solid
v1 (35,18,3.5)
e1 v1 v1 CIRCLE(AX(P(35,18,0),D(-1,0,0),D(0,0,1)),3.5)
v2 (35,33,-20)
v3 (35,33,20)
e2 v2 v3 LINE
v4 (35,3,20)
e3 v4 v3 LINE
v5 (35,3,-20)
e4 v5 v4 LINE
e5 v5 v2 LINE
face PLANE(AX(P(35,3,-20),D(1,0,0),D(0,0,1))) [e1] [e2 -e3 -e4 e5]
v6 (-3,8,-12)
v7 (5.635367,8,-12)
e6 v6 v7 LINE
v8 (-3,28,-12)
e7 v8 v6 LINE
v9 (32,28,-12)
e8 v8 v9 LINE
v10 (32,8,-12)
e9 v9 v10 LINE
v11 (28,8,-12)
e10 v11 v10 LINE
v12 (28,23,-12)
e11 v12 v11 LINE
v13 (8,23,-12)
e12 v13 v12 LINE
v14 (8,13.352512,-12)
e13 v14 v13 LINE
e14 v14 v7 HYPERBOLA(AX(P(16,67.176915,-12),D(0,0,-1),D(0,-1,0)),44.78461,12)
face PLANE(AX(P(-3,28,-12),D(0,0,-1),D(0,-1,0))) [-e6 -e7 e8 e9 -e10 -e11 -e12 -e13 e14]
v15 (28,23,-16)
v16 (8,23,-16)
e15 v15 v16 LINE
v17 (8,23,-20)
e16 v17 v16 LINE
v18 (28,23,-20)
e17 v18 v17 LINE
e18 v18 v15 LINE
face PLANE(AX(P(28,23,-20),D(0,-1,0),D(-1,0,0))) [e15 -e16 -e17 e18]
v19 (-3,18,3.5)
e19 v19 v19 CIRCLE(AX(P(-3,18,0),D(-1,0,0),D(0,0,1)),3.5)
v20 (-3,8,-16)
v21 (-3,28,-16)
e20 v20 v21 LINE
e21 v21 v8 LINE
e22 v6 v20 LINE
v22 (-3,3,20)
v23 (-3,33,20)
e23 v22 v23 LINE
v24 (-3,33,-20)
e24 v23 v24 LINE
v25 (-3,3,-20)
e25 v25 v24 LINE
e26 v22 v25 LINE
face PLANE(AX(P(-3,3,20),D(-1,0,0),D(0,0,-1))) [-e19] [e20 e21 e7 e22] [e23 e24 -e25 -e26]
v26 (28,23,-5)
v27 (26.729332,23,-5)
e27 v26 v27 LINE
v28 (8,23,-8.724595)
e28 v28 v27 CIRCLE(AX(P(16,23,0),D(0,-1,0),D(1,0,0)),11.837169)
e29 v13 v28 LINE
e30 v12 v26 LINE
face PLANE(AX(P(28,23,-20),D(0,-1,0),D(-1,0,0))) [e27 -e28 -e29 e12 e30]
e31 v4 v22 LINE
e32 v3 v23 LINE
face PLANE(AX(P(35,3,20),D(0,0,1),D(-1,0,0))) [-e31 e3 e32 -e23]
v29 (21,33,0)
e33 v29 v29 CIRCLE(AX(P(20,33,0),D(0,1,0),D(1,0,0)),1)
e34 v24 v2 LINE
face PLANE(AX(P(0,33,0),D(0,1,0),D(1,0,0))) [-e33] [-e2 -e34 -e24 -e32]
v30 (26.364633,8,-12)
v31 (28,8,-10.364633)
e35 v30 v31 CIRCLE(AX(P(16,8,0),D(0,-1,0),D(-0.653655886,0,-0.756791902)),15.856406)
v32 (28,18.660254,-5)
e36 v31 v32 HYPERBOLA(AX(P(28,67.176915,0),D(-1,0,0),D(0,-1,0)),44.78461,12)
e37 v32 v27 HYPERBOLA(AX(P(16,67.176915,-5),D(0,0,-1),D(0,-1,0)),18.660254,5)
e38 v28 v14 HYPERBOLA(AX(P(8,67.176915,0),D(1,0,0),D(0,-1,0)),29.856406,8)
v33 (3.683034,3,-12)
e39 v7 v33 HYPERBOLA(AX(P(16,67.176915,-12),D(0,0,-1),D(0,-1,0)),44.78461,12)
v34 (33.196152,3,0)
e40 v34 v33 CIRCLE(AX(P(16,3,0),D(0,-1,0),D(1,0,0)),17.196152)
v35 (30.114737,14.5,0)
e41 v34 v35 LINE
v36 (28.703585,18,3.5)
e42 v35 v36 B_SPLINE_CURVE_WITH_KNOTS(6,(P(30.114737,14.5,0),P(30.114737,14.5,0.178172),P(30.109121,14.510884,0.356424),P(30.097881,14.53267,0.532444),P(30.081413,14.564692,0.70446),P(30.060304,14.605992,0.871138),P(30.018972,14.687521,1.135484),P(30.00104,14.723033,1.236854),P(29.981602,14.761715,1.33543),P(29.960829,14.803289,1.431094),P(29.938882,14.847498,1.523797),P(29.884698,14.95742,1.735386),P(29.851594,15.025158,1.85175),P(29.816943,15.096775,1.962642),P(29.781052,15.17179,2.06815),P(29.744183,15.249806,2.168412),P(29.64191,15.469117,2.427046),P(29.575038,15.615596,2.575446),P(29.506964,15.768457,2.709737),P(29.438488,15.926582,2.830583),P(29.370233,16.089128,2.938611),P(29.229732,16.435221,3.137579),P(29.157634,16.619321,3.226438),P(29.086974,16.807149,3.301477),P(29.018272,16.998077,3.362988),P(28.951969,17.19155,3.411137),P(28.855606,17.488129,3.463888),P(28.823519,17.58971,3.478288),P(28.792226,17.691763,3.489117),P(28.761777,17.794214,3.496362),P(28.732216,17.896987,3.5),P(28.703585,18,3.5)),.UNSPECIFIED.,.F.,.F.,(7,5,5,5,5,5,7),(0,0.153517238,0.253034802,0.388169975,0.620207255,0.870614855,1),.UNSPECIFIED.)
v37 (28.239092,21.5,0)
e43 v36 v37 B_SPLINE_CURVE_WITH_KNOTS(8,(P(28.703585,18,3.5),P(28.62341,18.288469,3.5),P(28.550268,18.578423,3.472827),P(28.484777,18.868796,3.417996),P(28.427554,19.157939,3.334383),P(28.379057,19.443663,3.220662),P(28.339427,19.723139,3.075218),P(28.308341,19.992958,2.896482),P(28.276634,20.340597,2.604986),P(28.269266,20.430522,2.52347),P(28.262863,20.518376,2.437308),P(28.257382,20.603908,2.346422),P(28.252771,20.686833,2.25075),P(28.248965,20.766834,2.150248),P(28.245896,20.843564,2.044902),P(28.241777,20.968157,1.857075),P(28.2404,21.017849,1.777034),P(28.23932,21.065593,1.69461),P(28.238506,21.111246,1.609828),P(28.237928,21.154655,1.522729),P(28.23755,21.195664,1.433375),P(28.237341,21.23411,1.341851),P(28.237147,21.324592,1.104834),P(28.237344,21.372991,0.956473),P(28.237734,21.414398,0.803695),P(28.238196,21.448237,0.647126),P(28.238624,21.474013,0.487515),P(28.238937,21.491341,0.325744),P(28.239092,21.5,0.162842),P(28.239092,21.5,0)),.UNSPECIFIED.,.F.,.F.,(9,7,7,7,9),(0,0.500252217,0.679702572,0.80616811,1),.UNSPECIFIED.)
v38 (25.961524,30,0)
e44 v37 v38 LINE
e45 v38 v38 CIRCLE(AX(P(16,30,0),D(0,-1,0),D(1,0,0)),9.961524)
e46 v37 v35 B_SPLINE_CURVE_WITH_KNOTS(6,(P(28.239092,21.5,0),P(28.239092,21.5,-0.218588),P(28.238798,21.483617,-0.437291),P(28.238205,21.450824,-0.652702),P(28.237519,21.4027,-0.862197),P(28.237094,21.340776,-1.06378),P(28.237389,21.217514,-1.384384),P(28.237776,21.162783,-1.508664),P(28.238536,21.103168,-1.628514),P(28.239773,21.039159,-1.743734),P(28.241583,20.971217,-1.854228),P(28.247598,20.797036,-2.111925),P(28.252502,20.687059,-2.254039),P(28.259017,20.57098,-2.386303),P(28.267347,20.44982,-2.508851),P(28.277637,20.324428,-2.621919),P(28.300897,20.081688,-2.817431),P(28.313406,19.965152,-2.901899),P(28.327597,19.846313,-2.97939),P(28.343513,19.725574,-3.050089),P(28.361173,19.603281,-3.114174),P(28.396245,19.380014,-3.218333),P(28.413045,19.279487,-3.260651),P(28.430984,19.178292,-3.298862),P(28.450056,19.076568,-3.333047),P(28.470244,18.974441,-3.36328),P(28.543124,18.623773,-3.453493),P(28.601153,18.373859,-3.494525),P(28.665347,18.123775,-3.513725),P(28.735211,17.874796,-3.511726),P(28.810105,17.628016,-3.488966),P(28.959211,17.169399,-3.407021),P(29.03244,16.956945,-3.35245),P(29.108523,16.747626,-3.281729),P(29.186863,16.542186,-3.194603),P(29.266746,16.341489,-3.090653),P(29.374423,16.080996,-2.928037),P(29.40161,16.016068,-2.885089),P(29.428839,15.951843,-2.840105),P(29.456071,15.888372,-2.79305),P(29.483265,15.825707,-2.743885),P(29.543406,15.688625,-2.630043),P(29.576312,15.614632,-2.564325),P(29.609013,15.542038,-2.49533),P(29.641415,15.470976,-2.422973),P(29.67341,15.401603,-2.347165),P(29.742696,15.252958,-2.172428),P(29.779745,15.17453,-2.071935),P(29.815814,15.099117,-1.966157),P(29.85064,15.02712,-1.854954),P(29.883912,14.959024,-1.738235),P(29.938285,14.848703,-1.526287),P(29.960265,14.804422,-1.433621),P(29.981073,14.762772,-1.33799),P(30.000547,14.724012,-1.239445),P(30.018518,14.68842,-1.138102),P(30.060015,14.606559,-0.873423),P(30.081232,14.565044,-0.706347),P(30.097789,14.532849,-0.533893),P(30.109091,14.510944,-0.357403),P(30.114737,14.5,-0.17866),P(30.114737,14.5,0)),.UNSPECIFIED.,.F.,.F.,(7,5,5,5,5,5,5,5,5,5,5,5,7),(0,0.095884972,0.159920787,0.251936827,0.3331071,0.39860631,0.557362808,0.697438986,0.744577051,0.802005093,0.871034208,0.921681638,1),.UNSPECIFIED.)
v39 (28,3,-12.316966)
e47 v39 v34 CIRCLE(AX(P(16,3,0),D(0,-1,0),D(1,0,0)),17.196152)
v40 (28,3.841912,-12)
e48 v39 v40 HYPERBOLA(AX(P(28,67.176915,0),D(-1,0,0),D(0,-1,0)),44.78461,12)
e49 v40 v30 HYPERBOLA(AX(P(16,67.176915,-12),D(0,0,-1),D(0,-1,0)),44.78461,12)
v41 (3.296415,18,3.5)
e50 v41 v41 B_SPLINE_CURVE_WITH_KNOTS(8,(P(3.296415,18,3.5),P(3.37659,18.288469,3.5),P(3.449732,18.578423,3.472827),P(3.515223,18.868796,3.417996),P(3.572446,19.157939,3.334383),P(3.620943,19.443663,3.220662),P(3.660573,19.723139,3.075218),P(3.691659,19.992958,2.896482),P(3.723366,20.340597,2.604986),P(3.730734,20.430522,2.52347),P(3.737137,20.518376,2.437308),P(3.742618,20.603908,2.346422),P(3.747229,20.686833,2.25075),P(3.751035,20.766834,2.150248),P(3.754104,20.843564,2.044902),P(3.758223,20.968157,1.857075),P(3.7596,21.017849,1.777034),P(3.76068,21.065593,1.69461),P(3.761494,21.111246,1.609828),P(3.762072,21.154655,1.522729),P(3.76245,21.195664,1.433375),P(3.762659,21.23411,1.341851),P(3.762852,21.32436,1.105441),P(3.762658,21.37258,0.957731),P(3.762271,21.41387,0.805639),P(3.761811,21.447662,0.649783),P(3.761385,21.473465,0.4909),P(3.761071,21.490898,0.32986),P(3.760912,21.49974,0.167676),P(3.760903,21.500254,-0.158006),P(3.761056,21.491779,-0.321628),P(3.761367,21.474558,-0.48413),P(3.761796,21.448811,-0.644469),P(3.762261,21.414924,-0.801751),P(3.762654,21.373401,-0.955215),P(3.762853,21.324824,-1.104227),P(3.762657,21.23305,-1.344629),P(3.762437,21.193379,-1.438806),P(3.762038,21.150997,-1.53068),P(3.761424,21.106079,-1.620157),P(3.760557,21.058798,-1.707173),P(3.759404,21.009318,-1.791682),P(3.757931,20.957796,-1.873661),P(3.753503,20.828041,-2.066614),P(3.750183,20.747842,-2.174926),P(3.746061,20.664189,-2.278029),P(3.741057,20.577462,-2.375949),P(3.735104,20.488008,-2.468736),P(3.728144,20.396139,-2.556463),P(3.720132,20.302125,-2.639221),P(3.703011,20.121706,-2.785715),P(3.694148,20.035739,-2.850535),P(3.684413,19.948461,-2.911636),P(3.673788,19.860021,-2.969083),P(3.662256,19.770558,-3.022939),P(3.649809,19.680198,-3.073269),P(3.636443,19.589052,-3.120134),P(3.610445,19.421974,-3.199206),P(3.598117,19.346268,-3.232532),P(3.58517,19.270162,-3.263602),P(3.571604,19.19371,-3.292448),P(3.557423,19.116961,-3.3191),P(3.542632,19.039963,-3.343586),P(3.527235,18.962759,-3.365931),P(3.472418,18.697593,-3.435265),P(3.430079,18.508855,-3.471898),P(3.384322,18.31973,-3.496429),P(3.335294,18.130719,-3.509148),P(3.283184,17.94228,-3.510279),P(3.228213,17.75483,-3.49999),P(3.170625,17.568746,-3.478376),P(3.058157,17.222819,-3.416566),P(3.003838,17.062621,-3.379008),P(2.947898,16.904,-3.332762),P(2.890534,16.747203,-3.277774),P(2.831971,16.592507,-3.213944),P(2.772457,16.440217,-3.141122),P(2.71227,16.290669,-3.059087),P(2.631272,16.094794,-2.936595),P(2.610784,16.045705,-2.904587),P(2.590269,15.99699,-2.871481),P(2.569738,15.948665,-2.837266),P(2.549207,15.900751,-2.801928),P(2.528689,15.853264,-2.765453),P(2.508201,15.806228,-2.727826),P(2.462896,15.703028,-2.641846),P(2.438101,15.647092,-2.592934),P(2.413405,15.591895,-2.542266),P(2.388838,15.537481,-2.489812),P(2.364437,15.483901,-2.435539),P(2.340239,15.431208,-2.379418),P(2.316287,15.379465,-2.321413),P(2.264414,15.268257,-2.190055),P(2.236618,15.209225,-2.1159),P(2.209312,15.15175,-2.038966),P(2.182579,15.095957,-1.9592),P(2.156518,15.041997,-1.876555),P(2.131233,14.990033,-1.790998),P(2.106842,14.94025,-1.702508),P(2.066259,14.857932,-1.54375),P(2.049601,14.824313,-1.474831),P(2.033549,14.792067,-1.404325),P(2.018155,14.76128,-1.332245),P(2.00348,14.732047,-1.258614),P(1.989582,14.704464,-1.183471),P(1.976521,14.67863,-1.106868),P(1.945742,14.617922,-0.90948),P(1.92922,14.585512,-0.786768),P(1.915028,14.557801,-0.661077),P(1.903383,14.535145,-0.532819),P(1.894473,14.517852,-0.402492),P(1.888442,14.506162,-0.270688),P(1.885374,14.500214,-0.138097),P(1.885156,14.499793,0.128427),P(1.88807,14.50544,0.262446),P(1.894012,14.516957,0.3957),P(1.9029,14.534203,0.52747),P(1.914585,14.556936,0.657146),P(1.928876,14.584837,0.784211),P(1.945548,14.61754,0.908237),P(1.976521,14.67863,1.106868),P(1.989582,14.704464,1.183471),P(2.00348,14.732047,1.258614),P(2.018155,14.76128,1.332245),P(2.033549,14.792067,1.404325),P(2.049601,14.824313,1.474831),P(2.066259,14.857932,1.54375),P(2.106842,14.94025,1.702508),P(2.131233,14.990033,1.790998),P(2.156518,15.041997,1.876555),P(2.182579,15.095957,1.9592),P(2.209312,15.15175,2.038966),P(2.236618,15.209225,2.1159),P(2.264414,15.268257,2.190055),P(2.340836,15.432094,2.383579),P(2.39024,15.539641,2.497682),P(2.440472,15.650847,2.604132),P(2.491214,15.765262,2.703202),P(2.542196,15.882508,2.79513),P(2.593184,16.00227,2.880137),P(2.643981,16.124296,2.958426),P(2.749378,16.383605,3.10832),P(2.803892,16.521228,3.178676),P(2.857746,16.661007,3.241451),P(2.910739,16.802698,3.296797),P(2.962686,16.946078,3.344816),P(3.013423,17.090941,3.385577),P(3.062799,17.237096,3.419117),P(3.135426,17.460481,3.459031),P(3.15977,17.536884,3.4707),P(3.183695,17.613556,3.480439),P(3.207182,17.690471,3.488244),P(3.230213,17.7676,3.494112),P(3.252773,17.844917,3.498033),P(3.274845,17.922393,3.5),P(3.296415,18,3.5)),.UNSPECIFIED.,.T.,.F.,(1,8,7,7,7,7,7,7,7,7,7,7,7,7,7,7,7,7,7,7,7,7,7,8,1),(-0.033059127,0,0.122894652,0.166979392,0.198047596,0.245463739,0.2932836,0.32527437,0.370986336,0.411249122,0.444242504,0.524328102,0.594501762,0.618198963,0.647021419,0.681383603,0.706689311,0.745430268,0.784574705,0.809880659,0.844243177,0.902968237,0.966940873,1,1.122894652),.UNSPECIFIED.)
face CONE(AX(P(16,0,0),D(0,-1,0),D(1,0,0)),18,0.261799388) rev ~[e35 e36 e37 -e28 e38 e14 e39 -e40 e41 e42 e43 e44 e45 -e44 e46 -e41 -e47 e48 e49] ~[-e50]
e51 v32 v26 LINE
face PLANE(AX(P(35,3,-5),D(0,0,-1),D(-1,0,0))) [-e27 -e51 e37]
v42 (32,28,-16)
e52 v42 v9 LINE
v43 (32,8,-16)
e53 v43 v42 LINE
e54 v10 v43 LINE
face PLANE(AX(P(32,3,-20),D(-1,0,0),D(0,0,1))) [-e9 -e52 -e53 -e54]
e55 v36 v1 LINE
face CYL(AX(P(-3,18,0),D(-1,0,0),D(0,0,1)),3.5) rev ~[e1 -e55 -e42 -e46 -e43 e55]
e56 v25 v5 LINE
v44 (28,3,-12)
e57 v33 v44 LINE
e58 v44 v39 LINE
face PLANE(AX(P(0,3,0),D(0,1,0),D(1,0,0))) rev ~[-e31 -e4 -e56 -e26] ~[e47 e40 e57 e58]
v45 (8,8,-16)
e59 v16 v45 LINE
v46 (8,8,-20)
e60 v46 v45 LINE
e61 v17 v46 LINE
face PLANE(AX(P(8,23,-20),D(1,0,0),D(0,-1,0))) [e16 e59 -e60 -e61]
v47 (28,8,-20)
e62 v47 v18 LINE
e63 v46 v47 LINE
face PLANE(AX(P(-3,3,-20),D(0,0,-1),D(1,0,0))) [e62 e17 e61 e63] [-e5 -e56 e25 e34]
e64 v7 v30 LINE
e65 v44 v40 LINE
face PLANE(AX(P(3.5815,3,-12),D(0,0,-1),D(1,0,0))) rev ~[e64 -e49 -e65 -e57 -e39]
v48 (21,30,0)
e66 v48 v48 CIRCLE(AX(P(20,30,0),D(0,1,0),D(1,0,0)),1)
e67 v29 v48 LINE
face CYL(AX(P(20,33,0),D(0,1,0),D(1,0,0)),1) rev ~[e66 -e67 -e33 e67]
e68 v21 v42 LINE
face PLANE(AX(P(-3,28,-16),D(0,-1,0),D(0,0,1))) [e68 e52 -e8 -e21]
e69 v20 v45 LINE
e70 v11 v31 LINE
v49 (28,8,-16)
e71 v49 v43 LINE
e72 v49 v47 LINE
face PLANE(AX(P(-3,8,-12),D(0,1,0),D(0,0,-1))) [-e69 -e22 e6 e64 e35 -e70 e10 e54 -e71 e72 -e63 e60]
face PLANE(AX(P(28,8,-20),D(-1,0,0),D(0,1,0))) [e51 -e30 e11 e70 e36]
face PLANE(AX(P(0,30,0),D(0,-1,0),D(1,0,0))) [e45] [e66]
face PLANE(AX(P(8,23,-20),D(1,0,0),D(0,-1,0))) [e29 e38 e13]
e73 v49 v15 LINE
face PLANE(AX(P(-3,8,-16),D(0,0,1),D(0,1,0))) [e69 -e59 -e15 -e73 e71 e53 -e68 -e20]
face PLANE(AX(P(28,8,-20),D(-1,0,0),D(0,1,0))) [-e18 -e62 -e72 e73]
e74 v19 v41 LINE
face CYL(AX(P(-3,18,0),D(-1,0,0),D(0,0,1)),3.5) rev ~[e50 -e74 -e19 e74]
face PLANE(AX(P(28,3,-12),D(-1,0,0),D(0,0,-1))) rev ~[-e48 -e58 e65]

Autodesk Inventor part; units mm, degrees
ref_plane "YZ Plane" through (0, 0, 0) normal (1, 0, 0) x (0, 1, 0)
ref_plane "XZ Plane" through (0, 0, 0) normal (0, 1, 0) x (-1, 0, 0)
ref_plane "XY Plane" through (0, 0, 0) normal (0, 0, 1) x (1, 0, 0)
ref_plane "Work Plane13" through (0, 3, 0) normal (0, 1, 0) x (1, 0, 0)
sketch "Sketch45" plane through (0, 3, 0) normal (0, 1, 0) x (1, 0, 0)
  line L0 (35, -20) -> (-3, -20)
  line L1 (-3, -20) -> (-3, 20)
  line L2 (-3, 20) -> (35, 20)
  line L3 (35, 20) -> (35, -20)
  point P0 (0, 0)
  dimension "d142" = 38
  dimension "d143" = 40
extrude "Extrusion34" add sketch "Sketch45" along normal blind 30
sketch "Sketch46" plane through (0, 33, 0) normal (0, 1, 0) x (1, 0, 0)
  point P0 (0, 0)
ref_plane "Work Plane11" through (0, 0, 0) normal (0, -1, 0) x (1, 0, 0)
sketch "Sketch47" plane through (0, 0, 0) normal (0, -1, 0) x (1, 0, 0)
  circle A0 centre (16, 0) radius 18
  point P0 (0, 0)
  dimension "d146" = 36
extrude "Extrusion35" cut sketch "Sketch47" against normal blind 30 draft -15
sketch "Sketch48" plane through (0, 33, 0) normal (0, 1, 0) x (1, 0, 0)
  point P0 (0, 0)
sketch "Sketch49" plane through (0, 33, 0) normal (0, 1, 0) x (1, 0, 0)
  circle A0 centre (20, 0) radius 1
  point P0 (0, 0)
  dimension "d149" = 2
extrude "Extrusion36" cut sketch "Sketch49" against normal through all
ref_plane "Work Plane7" through (35, 3, -20) normal (0, 0, -1) x (-1, 0, 0)
sketch "Sketch58" plane through (35, 3, -20) normal (0, 0, -1) x (-1, 0, 0)
  line L0 (7, 20) -> (27, 20)
  line L1 (27, 20) -> (27, 5)
  line L2 (27, 5) -> (7, 5)
  line L3 (7, 5) -> (7, 20)
  point P0 (35, -3)
  dimension "d156" = 20
  dimension "d157" = 15
extrude "Extrusion38" cut sketch "Sketch58" against normal blind 15
ref_plane "Work Plane4" through (-3, 3, -20) normal (-1, 0, 0) x (0, 0, 1)
sketch "Sketch59" plane through (-3, 3, -20) normal (-1, 0, 0) x (0, 0, 1)
  line L0 (4, 25) -> (8, 25)
  line L1 (8, 25) -> (8, 5)
  line L2 (8, 5) -> (4, 5)
  line L3 (4, 5) -> (4, 25)
  point P0 (20, -3)
  dimension "d160" = 4
  dimension "d161" = 20
extrude "Extrusion39" cut sketch "Sketch59" against normal blind 35
ref_plane "Work Plane1" through (0, 3, 0) normal (0, 1, 0) x (1, 0, 0)
ref_plane "Work Plane6" through (0, 23, 0) normal (0, 1, 0) x (1, 0, 0)
sketch "Sketch62" plane through (-3, 3, -20) normal (-1, 0, 0) x (0, 0, 1)
  circle A0 centre (20, 15) radius 3.5
  point P0 (20, -3)
  dimension "d172" = 7
extrude "Extrusion42" cut sketch "Sketch62" against normal through all
sketch "Sketch65" plane through (0, 3, 0) normal (0, -1, 0) x (1, 0, 0)
  line L0 (-3, -12) -> (32, -12) projected
  line L1 (28, -20) -> (28, -16) projected
  line L2 (3.5815, -12) -> (28, -12)
  line L3 (28, -12) -> (28, -17.2375)
  line L4 (28, -17.2375) -> (3.5815, -17.2375)
  line L5 (3.5815, -17.2375) -> (3.5815, -12)
  point P0 (0, 0)
extrude "Extrusion44" add sketch "Sketch65" against normal blind 5
properties part number "liquid port_only_v04"
